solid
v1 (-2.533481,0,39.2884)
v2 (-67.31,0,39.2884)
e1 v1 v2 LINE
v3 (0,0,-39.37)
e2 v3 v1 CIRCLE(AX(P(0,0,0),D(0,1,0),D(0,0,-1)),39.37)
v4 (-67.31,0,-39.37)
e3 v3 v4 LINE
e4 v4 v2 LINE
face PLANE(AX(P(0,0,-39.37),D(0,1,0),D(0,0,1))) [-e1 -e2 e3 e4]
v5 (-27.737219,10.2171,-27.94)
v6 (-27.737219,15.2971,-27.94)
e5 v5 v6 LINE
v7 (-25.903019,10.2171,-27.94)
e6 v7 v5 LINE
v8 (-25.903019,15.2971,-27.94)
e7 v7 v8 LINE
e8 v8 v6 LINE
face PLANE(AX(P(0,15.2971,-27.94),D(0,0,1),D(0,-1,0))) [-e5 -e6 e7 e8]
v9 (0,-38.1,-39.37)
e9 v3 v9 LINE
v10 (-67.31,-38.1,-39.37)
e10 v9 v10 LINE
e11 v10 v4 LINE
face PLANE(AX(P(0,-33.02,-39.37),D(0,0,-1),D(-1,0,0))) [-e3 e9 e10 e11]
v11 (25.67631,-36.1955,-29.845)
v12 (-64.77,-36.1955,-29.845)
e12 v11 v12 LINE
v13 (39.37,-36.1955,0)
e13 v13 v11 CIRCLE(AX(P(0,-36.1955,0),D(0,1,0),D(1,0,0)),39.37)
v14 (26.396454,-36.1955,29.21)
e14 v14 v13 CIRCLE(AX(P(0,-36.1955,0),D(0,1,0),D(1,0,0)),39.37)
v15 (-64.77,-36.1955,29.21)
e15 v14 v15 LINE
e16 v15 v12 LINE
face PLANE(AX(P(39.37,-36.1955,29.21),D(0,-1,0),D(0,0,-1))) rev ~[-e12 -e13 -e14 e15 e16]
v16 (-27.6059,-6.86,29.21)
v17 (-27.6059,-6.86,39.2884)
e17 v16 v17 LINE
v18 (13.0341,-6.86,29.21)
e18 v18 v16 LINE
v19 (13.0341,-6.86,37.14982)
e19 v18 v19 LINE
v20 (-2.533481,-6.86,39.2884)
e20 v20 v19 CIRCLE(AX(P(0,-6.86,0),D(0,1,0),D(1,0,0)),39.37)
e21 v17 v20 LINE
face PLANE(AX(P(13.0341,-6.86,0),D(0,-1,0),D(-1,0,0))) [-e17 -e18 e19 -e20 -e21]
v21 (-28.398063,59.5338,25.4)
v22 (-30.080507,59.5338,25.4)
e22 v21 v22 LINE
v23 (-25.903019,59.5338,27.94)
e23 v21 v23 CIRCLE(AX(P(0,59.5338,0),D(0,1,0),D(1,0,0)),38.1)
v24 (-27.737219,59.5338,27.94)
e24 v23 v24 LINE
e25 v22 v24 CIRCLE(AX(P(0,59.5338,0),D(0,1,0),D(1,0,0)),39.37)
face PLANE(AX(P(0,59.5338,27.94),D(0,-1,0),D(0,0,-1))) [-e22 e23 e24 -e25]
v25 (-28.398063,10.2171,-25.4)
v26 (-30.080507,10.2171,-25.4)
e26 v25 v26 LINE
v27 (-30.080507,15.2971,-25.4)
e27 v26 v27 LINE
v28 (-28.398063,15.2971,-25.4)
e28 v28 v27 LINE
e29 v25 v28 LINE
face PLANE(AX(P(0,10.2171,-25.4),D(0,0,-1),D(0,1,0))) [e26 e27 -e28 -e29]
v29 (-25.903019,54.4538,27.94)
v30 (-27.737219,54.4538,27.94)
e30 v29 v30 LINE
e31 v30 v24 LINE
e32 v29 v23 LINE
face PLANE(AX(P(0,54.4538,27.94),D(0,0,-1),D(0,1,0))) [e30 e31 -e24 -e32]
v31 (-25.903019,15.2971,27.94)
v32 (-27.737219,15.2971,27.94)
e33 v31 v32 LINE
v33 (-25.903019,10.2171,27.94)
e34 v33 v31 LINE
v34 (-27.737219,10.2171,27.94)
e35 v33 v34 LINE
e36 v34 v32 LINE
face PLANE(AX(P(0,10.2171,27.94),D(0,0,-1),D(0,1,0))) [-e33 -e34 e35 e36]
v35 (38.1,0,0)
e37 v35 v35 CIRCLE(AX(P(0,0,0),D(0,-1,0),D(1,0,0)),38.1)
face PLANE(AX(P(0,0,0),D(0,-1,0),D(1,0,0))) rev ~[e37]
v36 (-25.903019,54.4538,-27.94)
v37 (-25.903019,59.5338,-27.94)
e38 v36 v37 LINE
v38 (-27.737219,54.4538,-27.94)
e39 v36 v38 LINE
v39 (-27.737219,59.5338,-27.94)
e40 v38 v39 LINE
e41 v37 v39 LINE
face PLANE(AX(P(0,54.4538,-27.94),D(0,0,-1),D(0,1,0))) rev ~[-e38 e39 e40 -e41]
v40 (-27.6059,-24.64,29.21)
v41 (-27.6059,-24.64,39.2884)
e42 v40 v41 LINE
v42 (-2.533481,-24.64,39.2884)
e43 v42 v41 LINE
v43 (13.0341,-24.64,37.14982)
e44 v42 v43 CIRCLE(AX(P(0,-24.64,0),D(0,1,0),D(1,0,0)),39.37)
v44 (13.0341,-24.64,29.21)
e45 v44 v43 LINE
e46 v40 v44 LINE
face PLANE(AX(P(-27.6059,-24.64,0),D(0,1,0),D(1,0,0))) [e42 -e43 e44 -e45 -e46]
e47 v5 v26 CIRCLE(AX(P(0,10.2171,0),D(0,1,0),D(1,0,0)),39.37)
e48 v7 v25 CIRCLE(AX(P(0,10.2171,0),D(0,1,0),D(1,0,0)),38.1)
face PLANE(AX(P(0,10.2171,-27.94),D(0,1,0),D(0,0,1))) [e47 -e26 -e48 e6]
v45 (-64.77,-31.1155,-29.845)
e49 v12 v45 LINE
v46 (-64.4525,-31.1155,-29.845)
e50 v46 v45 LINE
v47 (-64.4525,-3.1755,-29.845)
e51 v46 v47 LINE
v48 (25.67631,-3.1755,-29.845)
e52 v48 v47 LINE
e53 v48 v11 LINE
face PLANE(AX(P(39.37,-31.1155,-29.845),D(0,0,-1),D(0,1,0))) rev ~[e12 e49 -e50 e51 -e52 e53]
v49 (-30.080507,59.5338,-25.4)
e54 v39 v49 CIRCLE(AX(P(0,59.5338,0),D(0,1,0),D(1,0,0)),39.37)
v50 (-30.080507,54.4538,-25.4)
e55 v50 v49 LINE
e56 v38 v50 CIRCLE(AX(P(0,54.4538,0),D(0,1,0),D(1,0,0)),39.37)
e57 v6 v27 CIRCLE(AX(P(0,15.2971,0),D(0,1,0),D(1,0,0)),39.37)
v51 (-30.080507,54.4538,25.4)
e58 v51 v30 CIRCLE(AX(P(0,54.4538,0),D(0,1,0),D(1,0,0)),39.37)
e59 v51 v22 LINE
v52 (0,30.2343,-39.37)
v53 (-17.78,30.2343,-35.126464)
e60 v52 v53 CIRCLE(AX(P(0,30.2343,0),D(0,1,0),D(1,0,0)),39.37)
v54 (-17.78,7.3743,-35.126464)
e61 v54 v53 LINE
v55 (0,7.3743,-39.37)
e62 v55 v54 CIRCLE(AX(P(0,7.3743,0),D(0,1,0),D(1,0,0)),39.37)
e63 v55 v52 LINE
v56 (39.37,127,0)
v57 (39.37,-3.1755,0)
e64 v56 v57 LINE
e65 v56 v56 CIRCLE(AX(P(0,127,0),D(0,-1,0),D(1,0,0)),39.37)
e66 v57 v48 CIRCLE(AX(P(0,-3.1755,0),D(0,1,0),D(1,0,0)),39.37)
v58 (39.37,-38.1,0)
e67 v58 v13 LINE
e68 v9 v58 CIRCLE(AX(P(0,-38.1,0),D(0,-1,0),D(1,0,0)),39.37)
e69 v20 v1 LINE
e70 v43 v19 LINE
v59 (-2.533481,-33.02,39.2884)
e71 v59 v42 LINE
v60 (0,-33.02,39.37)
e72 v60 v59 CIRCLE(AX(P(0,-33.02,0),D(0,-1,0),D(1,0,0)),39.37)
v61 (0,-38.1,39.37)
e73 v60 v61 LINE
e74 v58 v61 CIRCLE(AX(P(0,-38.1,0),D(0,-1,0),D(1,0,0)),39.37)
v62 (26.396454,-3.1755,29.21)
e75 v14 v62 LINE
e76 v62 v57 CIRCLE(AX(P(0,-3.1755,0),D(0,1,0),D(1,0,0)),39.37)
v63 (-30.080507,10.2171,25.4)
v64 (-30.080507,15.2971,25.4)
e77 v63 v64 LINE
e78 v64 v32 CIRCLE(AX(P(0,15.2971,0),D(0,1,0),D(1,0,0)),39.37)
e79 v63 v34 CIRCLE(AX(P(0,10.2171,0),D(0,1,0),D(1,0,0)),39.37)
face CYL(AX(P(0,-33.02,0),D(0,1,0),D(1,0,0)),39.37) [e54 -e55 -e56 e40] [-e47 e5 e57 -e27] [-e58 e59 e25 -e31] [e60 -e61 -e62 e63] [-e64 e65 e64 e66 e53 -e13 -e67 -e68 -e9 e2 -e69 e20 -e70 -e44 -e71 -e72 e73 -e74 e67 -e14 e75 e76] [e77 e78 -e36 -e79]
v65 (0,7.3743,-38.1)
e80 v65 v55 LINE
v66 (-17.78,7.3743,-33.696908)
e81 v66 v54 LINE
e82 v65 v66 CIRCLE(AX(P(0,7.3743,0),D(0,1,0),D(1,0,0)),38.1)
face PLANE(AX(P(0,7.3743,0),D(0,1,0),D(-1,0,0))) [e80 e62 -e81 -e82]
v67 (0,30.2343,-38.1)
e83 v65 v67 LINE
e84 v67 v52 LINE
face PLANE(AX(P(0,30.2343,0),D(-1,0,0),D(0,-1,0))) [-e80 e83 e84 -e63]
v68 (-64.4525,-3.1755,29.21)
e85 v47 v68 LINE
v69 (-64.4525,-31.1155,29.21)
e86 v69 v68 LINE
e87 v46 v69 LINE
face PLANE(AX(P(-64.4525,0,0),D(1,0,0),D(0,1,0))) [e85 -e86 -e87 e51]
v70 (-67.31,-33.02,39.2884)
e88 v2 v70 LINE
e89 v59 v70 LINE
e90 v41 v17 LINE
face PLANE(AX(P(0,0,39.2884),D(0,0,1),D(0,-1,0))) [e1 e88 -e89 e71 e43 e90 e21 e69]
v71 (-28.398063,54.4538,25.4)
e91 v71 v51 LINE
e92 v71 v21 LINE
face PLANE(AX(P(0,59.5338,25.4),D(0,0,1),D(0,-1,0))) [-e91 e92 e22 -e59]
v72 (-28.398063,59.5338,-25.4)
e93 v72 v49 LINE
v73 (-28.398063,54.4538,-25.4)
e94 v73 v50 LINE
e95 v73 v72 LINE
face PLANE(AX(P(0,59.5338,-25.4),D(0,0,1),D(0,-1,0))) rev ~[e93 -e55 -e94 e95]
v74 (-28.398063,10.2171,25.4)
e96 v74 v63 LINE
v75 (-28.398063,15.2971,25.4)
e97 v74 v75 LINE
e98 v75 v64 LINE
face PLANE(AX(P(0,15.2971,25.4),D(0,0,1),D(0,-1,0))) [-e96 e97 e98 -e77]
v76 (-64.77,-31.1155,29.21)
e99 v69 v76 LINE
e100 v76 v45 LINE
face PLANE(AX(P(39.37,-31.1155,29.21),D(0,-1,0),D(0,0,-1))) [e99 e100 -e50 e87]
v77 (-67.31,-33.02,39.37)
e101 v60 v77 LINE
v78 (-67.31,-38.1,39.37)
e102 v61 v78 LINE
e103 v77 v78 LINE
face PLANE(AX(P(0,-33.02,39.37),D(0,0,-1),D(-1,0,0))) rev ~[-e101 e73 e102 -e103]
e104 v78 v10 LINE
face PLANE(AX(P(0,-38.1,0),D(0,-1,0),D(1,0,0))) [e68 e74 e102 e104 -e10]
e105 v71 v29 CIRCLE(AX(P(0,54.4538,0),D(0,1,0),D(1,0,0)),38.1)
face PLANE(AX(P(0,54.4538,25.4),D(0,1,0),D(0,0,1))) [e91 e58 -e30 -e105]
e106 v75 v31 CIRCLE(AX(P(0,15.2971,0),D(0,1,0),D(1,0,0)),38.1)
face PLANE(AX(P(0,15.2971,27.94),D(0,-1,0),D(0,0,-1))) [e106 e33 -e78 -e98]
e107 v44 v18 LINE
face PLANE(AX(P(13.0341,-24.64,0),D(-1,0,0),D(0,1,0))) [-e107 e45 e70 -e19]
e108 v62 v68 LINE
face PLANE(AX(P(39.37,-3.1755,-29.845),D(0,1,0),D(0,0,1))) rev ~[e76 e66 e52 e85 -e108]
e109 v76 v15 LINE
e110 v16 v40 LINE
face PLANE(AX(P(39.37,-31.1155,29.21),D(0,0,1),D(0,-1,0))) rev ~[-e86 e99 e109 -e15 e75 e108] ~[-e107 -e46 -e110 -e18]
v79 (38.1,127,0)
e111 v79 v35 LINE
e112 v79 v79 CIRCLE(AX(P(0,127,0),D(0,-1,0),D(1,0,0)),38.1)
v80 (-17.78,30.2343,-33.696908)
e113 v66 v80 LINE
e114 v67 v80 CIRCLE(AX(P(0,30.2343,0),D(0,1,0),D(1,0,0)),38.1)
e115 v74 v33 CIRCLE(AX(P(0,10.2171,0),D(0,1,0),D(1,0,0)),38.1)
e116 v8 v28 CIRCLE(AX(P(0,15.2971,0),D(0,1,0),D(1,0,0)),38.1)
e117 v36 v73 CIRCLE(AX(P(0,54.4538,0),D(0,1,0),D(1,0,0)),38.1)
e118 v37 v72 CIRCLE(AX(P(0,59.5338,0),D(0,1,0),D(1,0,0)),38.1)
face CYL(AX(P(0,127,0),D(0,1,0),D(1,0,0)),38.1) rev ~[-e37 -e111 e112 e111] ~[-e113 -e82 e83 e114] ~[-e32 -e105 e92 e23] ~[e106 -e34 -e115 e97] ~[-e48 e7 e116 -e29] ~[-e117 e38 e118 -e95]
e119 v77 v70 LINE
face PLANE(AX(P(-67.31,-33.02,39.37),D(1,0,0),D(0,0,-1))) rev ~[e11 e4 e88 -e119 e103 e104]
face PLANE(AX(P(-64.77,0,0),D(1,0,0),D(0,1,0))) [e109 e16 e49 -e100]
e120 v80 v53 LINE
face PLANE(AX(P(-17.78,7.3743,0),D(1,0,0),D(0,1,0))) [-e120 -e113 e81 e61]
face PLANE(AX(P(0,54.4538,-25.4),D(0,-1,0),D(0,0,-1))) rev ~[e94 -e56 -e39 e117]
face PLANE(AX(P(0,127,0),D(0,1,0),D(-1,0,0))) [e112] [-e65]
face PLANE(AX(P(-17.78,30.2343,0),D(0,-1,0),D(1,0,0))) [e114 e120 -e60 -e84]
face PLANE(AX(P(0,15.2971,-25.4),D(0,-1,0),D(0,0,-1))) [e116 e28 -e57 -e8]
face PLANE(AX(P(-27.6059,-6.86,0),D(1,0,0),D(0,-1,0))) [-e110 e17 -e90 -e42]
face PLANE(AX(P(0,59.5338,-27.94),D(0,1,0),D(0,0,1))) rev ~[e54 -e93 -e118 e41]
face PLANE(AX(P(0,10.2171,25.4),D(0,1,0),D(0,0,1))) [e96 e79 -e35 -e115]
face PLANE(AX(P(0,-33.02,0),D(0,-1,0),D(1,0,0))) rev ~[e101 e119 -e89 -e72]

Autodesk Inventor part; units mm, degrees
ref_plane "XZ Plane" through (0, 0, 0) normal (0, 1, 0) x (-1, 0, 0)
ref_plane "XY Plane" through (0, 0, 0) normal (0, 0, 1) x (1, 0, 0)
sketch "Sketch1" plane through (0, 0, 0) normal (0, 1, 0) x (-1, 0, 0)
  circle A0 centre (0, 0) radius 39.37
  dimension "d0" = 78.74
extrude "Extrusion1" add sketch "Sketch1" along normal blind 127
sketch "Sketch2" plane through (0, 127, 0) normal (0, 1, 0) x (1, 0, 0)
  circle A0 centre (0, 0) radius 38.1
  dimension "d3" = 76.2
extrude "Extrusion2" cut sketch "Sketch2" against normal blind 127
sketch "Sketch3" plane through (0, 0, 0) normal (0, -1, 0) x (1, 0, 0)
  circle A0 centre (0, 0) radius 39.37
extrude "Extrusion3" add sketch "Sketch3" along normal blind 33.02
sketch "Sketch4" plane through (0, 0, 0) normal (1, 0, 0) x (0, 1, 0)
  line L0 (-33.02, 39.37) -> (-33.02, -39.37) projected
  line L1 (0, 39.2884) -> (-33.02, 39.2884)
  line L2 (-33.02, 39.2884) -> (-33.02, -39.37)
  line L3 (-33.02, -39.37) -> (0, -39.37)
  line L4 (0, -39.37) -> (0, 39.2884)
  point P0 (0, 0)
extrude "Extrusion4" add sketch "Sketch4" against normal blind 67.31
ref_plane "Work Plane1" through (39.37, 0, 0) normal (1, 0, 0) x (0, 1, 0)
sketch "Sketch5" plane through (39.37, 0, 0) normal (1, 0, 0) x (0, 1, 0)
  line L0 (-3.1755, 0) -> (-31.1155, 0)
  line L1 (-31.1155, 0) -> (-31.1155, 29.21)
  line L2 (-31.1155, 29.21) -> (-3.1755, 29.21)
  line L3 (-3.1755, 29.21) -> (-3.1755, 0)
  line L4 (-3.1755, 0) -> (-31.1155, 0)
  line L5 (-31.1155, 0) -> (-31.1155, -29.845)
  line L6 (-31.1155, -29.845) -> (-3.1755, -29.845)
  line L7 (-3.1755, -29.845) -> (-3.1755, 0)
  point P0 (0, 0)
  dimension "d10" = 27.94
  dimension "d11" = 29.21
  dimension "d12" = 27.94
  dimension "d13" = 29.845
extrude "Extrusion5" cut sketch "Sketch5" against normal blind 103.8225
sketch "Sketch6" plane through (0, 0, 0) normal (0, 0, 1) x (1, 0, 0)
  line L0 (39.37, -33.02) -> (39.37, 127) projected
  line L1 (39.37, -2.744) -> (13.0341, -2.744)
  line L2 (13.0341, -2.744) -> (-104.9586, 63.1124)
  line L3 (13.0341, -6.86) -> (-27.6059, -6.86)
  line L4 (-27.6059, -6.86) -> (-27.6059, -24.64)
  line L5 (-27.6059, -24.64) -> (13.0341, -24.64)
  line L6 (13.0341, -24.64) -> (13.0341, -6.86)
  point P0 (0, 0)
  dimension "d16" = 40.64
  dimension "d17" = 17.78
extrude "Extrusion6" cut sketch "Sketch6" along normal blind 102.5525
sketch "Sketch7" plane through (0, 0, 0) normal (0, 0, 1) x (1, 0, 0)
  point P0 (0, 0)
sketch "Sketch8" plane through (0, 0, 0) normal (0, 0, 1) x (1, 0, 0)
  point P0 (0, 0)
sketch "Sketch9" plane through (0, 0, 0) normal (0, 0, 1) x (1, 0, 0)
  point P0 (0, 0)
sketch "Sketch10" plane through (0, 0, 0) normal (0, 0, 1) x (1, 0, 0)
  line L0 (0, 7.3743) -> (-17.78, 7.3743)
  line L1 (-17.78, 7.3743) -> (-17.78, 30.2343)
  line L2 (-17.78, 30.2343) -> (0, 30.2343)
  line L3 (0, 30.2343) -> (0, 7.3743)
  point P0 (0, 0)
  dimension "d20" = 17.78
  dimension "d21" = 22.86
extrude "Extrusion7" cut sketch "Sketch10" against normal blind 102.5525
sketch "Sketch11" plane through (0, 0, 0) normal (1, 0, 0) x (0, 1, 0)
  line L0 (127, -39.37) -> (127, 39.37) projected
  line L1 (127, 0) -> (68.58, 0)
  line L2 (68.58, 0) -> (68.58, 25.4)
  line L3 (59.5338, 0) -> (59.5338, -25.4)
  line L4 (59.5338, -25.4) -> (54.4538, -25.4)
  line L5 (54.4538, -25.4) -> (54.4538, -27.94)
  line L6 (54.4538, -27.94) -> (59.5338, -27.94)
  line L7 (59.5338, -27.94) -> (59.5338, -25.4)
  line L8 (59.5338, 25.4) -> (54.4538, 25.4)
  line L9 (54.4538, 25.4) -> (54.4538, 27.94)
  line L10 (54.4538, 27.94) -> (59.5338, 27.94)
  line L11 (59.5338, 27.94) -> (59.5338, 25.4)
  line L12 (15.2971, -27.94) -> (10.2171, -27.94)
  line L13 (10.2171, -27.94) -> (10.2171, -25.4)
  line L14 (10.2171, -25.4) -> (15.2971, -25.4)
  line L15 (15.2971, -25.4) -> (15.2971, -27.94)
  line L16 (15.2971, 25.4) -> (10.2171, 25.4)
  line L17 (10.2171, 25.4) -> (10.2171, 27.94)
  line L18 (10.2171, 27.94) -> (15.2971, 27.94)
  line L19 (15.2971, 27.94) -> (15.2971, 25.4)
  point P0 (0, 0)
  dimension "d24" = 58.42
  dimension "d25" = 25.4
  dimension "d26" = 25.4
  dimension "d27" = 5.08
  dimension "d28" = 2.54
  dimension "d29" = 5.08
  dimension "d30" = 2.54
  dimension "d31" = 5.08
  dimension "d32" = 2.54
extrude "Extrusion8" cut sketch "Sketch11" against normal blind 83.185
sketch "Sketch12" plane through (0, -33.02, 0) normal (0, -1, 0) x (1, 0, 0)
  point P0 (0, 0)
sketch "Sketch13" plane through (0, -33.02, 0) normal (0, -1, 0) x (1, 0, 0)
  circle A0 centre (0, 0) radius 39.37
  dimension "d35" = 78.74
extrude "Extrusion9" add sketch "Sketch13" along normal blind 5.08
sketch "Sketch14" plane through (0, -33.02, 0) normal (0, -1, 0) x (1, 0, 0)
  circle A0 centre (0, 0) radius 39.37 projected
  line L0 (0, -39.37) -> (-67.31, -39.37) projected
  line L1 (0, 39.37) -> (-67.31, 39.37)
  line L2 (-67.31, 39.37) -> (-67.31, -39.37)
  line L3 (-67.31, -39.37) -> (0, -39.37)
  line L4 (0, -39.37) -> (0, 39.37)
extrude "Extrusion10" add sketch "Sketch14" along normal blind 5.08 contours A0 L0 L2 L1
sketch "Sketch15" plane through (39.37, 0, 0) normal (1, 0, 0) x (0, 1, 0)
  line L0 (-31.1155, 29.21) -> (-31.1155, -29.845) projected
  line L1 (-31.1155, 29.21) -> (-36.1955, 29.21)
  line L2 (-36.1955, 29.21) -> (-36.1955, -29.845)
  line L3 (-36.1955, -29.845) -> (-31.1155, -29.845)
  line L4 (-31.1155, -29.845) -> (-31.1155, 29.21)
  point P0 (0, 0)
  dimension "d40" = 5.08
  dimension "d41" = 59.055
extrude "Extrusion11" cut sketch "Sketch15" against normal blind 104.14
properties part number "_3DPrint"
